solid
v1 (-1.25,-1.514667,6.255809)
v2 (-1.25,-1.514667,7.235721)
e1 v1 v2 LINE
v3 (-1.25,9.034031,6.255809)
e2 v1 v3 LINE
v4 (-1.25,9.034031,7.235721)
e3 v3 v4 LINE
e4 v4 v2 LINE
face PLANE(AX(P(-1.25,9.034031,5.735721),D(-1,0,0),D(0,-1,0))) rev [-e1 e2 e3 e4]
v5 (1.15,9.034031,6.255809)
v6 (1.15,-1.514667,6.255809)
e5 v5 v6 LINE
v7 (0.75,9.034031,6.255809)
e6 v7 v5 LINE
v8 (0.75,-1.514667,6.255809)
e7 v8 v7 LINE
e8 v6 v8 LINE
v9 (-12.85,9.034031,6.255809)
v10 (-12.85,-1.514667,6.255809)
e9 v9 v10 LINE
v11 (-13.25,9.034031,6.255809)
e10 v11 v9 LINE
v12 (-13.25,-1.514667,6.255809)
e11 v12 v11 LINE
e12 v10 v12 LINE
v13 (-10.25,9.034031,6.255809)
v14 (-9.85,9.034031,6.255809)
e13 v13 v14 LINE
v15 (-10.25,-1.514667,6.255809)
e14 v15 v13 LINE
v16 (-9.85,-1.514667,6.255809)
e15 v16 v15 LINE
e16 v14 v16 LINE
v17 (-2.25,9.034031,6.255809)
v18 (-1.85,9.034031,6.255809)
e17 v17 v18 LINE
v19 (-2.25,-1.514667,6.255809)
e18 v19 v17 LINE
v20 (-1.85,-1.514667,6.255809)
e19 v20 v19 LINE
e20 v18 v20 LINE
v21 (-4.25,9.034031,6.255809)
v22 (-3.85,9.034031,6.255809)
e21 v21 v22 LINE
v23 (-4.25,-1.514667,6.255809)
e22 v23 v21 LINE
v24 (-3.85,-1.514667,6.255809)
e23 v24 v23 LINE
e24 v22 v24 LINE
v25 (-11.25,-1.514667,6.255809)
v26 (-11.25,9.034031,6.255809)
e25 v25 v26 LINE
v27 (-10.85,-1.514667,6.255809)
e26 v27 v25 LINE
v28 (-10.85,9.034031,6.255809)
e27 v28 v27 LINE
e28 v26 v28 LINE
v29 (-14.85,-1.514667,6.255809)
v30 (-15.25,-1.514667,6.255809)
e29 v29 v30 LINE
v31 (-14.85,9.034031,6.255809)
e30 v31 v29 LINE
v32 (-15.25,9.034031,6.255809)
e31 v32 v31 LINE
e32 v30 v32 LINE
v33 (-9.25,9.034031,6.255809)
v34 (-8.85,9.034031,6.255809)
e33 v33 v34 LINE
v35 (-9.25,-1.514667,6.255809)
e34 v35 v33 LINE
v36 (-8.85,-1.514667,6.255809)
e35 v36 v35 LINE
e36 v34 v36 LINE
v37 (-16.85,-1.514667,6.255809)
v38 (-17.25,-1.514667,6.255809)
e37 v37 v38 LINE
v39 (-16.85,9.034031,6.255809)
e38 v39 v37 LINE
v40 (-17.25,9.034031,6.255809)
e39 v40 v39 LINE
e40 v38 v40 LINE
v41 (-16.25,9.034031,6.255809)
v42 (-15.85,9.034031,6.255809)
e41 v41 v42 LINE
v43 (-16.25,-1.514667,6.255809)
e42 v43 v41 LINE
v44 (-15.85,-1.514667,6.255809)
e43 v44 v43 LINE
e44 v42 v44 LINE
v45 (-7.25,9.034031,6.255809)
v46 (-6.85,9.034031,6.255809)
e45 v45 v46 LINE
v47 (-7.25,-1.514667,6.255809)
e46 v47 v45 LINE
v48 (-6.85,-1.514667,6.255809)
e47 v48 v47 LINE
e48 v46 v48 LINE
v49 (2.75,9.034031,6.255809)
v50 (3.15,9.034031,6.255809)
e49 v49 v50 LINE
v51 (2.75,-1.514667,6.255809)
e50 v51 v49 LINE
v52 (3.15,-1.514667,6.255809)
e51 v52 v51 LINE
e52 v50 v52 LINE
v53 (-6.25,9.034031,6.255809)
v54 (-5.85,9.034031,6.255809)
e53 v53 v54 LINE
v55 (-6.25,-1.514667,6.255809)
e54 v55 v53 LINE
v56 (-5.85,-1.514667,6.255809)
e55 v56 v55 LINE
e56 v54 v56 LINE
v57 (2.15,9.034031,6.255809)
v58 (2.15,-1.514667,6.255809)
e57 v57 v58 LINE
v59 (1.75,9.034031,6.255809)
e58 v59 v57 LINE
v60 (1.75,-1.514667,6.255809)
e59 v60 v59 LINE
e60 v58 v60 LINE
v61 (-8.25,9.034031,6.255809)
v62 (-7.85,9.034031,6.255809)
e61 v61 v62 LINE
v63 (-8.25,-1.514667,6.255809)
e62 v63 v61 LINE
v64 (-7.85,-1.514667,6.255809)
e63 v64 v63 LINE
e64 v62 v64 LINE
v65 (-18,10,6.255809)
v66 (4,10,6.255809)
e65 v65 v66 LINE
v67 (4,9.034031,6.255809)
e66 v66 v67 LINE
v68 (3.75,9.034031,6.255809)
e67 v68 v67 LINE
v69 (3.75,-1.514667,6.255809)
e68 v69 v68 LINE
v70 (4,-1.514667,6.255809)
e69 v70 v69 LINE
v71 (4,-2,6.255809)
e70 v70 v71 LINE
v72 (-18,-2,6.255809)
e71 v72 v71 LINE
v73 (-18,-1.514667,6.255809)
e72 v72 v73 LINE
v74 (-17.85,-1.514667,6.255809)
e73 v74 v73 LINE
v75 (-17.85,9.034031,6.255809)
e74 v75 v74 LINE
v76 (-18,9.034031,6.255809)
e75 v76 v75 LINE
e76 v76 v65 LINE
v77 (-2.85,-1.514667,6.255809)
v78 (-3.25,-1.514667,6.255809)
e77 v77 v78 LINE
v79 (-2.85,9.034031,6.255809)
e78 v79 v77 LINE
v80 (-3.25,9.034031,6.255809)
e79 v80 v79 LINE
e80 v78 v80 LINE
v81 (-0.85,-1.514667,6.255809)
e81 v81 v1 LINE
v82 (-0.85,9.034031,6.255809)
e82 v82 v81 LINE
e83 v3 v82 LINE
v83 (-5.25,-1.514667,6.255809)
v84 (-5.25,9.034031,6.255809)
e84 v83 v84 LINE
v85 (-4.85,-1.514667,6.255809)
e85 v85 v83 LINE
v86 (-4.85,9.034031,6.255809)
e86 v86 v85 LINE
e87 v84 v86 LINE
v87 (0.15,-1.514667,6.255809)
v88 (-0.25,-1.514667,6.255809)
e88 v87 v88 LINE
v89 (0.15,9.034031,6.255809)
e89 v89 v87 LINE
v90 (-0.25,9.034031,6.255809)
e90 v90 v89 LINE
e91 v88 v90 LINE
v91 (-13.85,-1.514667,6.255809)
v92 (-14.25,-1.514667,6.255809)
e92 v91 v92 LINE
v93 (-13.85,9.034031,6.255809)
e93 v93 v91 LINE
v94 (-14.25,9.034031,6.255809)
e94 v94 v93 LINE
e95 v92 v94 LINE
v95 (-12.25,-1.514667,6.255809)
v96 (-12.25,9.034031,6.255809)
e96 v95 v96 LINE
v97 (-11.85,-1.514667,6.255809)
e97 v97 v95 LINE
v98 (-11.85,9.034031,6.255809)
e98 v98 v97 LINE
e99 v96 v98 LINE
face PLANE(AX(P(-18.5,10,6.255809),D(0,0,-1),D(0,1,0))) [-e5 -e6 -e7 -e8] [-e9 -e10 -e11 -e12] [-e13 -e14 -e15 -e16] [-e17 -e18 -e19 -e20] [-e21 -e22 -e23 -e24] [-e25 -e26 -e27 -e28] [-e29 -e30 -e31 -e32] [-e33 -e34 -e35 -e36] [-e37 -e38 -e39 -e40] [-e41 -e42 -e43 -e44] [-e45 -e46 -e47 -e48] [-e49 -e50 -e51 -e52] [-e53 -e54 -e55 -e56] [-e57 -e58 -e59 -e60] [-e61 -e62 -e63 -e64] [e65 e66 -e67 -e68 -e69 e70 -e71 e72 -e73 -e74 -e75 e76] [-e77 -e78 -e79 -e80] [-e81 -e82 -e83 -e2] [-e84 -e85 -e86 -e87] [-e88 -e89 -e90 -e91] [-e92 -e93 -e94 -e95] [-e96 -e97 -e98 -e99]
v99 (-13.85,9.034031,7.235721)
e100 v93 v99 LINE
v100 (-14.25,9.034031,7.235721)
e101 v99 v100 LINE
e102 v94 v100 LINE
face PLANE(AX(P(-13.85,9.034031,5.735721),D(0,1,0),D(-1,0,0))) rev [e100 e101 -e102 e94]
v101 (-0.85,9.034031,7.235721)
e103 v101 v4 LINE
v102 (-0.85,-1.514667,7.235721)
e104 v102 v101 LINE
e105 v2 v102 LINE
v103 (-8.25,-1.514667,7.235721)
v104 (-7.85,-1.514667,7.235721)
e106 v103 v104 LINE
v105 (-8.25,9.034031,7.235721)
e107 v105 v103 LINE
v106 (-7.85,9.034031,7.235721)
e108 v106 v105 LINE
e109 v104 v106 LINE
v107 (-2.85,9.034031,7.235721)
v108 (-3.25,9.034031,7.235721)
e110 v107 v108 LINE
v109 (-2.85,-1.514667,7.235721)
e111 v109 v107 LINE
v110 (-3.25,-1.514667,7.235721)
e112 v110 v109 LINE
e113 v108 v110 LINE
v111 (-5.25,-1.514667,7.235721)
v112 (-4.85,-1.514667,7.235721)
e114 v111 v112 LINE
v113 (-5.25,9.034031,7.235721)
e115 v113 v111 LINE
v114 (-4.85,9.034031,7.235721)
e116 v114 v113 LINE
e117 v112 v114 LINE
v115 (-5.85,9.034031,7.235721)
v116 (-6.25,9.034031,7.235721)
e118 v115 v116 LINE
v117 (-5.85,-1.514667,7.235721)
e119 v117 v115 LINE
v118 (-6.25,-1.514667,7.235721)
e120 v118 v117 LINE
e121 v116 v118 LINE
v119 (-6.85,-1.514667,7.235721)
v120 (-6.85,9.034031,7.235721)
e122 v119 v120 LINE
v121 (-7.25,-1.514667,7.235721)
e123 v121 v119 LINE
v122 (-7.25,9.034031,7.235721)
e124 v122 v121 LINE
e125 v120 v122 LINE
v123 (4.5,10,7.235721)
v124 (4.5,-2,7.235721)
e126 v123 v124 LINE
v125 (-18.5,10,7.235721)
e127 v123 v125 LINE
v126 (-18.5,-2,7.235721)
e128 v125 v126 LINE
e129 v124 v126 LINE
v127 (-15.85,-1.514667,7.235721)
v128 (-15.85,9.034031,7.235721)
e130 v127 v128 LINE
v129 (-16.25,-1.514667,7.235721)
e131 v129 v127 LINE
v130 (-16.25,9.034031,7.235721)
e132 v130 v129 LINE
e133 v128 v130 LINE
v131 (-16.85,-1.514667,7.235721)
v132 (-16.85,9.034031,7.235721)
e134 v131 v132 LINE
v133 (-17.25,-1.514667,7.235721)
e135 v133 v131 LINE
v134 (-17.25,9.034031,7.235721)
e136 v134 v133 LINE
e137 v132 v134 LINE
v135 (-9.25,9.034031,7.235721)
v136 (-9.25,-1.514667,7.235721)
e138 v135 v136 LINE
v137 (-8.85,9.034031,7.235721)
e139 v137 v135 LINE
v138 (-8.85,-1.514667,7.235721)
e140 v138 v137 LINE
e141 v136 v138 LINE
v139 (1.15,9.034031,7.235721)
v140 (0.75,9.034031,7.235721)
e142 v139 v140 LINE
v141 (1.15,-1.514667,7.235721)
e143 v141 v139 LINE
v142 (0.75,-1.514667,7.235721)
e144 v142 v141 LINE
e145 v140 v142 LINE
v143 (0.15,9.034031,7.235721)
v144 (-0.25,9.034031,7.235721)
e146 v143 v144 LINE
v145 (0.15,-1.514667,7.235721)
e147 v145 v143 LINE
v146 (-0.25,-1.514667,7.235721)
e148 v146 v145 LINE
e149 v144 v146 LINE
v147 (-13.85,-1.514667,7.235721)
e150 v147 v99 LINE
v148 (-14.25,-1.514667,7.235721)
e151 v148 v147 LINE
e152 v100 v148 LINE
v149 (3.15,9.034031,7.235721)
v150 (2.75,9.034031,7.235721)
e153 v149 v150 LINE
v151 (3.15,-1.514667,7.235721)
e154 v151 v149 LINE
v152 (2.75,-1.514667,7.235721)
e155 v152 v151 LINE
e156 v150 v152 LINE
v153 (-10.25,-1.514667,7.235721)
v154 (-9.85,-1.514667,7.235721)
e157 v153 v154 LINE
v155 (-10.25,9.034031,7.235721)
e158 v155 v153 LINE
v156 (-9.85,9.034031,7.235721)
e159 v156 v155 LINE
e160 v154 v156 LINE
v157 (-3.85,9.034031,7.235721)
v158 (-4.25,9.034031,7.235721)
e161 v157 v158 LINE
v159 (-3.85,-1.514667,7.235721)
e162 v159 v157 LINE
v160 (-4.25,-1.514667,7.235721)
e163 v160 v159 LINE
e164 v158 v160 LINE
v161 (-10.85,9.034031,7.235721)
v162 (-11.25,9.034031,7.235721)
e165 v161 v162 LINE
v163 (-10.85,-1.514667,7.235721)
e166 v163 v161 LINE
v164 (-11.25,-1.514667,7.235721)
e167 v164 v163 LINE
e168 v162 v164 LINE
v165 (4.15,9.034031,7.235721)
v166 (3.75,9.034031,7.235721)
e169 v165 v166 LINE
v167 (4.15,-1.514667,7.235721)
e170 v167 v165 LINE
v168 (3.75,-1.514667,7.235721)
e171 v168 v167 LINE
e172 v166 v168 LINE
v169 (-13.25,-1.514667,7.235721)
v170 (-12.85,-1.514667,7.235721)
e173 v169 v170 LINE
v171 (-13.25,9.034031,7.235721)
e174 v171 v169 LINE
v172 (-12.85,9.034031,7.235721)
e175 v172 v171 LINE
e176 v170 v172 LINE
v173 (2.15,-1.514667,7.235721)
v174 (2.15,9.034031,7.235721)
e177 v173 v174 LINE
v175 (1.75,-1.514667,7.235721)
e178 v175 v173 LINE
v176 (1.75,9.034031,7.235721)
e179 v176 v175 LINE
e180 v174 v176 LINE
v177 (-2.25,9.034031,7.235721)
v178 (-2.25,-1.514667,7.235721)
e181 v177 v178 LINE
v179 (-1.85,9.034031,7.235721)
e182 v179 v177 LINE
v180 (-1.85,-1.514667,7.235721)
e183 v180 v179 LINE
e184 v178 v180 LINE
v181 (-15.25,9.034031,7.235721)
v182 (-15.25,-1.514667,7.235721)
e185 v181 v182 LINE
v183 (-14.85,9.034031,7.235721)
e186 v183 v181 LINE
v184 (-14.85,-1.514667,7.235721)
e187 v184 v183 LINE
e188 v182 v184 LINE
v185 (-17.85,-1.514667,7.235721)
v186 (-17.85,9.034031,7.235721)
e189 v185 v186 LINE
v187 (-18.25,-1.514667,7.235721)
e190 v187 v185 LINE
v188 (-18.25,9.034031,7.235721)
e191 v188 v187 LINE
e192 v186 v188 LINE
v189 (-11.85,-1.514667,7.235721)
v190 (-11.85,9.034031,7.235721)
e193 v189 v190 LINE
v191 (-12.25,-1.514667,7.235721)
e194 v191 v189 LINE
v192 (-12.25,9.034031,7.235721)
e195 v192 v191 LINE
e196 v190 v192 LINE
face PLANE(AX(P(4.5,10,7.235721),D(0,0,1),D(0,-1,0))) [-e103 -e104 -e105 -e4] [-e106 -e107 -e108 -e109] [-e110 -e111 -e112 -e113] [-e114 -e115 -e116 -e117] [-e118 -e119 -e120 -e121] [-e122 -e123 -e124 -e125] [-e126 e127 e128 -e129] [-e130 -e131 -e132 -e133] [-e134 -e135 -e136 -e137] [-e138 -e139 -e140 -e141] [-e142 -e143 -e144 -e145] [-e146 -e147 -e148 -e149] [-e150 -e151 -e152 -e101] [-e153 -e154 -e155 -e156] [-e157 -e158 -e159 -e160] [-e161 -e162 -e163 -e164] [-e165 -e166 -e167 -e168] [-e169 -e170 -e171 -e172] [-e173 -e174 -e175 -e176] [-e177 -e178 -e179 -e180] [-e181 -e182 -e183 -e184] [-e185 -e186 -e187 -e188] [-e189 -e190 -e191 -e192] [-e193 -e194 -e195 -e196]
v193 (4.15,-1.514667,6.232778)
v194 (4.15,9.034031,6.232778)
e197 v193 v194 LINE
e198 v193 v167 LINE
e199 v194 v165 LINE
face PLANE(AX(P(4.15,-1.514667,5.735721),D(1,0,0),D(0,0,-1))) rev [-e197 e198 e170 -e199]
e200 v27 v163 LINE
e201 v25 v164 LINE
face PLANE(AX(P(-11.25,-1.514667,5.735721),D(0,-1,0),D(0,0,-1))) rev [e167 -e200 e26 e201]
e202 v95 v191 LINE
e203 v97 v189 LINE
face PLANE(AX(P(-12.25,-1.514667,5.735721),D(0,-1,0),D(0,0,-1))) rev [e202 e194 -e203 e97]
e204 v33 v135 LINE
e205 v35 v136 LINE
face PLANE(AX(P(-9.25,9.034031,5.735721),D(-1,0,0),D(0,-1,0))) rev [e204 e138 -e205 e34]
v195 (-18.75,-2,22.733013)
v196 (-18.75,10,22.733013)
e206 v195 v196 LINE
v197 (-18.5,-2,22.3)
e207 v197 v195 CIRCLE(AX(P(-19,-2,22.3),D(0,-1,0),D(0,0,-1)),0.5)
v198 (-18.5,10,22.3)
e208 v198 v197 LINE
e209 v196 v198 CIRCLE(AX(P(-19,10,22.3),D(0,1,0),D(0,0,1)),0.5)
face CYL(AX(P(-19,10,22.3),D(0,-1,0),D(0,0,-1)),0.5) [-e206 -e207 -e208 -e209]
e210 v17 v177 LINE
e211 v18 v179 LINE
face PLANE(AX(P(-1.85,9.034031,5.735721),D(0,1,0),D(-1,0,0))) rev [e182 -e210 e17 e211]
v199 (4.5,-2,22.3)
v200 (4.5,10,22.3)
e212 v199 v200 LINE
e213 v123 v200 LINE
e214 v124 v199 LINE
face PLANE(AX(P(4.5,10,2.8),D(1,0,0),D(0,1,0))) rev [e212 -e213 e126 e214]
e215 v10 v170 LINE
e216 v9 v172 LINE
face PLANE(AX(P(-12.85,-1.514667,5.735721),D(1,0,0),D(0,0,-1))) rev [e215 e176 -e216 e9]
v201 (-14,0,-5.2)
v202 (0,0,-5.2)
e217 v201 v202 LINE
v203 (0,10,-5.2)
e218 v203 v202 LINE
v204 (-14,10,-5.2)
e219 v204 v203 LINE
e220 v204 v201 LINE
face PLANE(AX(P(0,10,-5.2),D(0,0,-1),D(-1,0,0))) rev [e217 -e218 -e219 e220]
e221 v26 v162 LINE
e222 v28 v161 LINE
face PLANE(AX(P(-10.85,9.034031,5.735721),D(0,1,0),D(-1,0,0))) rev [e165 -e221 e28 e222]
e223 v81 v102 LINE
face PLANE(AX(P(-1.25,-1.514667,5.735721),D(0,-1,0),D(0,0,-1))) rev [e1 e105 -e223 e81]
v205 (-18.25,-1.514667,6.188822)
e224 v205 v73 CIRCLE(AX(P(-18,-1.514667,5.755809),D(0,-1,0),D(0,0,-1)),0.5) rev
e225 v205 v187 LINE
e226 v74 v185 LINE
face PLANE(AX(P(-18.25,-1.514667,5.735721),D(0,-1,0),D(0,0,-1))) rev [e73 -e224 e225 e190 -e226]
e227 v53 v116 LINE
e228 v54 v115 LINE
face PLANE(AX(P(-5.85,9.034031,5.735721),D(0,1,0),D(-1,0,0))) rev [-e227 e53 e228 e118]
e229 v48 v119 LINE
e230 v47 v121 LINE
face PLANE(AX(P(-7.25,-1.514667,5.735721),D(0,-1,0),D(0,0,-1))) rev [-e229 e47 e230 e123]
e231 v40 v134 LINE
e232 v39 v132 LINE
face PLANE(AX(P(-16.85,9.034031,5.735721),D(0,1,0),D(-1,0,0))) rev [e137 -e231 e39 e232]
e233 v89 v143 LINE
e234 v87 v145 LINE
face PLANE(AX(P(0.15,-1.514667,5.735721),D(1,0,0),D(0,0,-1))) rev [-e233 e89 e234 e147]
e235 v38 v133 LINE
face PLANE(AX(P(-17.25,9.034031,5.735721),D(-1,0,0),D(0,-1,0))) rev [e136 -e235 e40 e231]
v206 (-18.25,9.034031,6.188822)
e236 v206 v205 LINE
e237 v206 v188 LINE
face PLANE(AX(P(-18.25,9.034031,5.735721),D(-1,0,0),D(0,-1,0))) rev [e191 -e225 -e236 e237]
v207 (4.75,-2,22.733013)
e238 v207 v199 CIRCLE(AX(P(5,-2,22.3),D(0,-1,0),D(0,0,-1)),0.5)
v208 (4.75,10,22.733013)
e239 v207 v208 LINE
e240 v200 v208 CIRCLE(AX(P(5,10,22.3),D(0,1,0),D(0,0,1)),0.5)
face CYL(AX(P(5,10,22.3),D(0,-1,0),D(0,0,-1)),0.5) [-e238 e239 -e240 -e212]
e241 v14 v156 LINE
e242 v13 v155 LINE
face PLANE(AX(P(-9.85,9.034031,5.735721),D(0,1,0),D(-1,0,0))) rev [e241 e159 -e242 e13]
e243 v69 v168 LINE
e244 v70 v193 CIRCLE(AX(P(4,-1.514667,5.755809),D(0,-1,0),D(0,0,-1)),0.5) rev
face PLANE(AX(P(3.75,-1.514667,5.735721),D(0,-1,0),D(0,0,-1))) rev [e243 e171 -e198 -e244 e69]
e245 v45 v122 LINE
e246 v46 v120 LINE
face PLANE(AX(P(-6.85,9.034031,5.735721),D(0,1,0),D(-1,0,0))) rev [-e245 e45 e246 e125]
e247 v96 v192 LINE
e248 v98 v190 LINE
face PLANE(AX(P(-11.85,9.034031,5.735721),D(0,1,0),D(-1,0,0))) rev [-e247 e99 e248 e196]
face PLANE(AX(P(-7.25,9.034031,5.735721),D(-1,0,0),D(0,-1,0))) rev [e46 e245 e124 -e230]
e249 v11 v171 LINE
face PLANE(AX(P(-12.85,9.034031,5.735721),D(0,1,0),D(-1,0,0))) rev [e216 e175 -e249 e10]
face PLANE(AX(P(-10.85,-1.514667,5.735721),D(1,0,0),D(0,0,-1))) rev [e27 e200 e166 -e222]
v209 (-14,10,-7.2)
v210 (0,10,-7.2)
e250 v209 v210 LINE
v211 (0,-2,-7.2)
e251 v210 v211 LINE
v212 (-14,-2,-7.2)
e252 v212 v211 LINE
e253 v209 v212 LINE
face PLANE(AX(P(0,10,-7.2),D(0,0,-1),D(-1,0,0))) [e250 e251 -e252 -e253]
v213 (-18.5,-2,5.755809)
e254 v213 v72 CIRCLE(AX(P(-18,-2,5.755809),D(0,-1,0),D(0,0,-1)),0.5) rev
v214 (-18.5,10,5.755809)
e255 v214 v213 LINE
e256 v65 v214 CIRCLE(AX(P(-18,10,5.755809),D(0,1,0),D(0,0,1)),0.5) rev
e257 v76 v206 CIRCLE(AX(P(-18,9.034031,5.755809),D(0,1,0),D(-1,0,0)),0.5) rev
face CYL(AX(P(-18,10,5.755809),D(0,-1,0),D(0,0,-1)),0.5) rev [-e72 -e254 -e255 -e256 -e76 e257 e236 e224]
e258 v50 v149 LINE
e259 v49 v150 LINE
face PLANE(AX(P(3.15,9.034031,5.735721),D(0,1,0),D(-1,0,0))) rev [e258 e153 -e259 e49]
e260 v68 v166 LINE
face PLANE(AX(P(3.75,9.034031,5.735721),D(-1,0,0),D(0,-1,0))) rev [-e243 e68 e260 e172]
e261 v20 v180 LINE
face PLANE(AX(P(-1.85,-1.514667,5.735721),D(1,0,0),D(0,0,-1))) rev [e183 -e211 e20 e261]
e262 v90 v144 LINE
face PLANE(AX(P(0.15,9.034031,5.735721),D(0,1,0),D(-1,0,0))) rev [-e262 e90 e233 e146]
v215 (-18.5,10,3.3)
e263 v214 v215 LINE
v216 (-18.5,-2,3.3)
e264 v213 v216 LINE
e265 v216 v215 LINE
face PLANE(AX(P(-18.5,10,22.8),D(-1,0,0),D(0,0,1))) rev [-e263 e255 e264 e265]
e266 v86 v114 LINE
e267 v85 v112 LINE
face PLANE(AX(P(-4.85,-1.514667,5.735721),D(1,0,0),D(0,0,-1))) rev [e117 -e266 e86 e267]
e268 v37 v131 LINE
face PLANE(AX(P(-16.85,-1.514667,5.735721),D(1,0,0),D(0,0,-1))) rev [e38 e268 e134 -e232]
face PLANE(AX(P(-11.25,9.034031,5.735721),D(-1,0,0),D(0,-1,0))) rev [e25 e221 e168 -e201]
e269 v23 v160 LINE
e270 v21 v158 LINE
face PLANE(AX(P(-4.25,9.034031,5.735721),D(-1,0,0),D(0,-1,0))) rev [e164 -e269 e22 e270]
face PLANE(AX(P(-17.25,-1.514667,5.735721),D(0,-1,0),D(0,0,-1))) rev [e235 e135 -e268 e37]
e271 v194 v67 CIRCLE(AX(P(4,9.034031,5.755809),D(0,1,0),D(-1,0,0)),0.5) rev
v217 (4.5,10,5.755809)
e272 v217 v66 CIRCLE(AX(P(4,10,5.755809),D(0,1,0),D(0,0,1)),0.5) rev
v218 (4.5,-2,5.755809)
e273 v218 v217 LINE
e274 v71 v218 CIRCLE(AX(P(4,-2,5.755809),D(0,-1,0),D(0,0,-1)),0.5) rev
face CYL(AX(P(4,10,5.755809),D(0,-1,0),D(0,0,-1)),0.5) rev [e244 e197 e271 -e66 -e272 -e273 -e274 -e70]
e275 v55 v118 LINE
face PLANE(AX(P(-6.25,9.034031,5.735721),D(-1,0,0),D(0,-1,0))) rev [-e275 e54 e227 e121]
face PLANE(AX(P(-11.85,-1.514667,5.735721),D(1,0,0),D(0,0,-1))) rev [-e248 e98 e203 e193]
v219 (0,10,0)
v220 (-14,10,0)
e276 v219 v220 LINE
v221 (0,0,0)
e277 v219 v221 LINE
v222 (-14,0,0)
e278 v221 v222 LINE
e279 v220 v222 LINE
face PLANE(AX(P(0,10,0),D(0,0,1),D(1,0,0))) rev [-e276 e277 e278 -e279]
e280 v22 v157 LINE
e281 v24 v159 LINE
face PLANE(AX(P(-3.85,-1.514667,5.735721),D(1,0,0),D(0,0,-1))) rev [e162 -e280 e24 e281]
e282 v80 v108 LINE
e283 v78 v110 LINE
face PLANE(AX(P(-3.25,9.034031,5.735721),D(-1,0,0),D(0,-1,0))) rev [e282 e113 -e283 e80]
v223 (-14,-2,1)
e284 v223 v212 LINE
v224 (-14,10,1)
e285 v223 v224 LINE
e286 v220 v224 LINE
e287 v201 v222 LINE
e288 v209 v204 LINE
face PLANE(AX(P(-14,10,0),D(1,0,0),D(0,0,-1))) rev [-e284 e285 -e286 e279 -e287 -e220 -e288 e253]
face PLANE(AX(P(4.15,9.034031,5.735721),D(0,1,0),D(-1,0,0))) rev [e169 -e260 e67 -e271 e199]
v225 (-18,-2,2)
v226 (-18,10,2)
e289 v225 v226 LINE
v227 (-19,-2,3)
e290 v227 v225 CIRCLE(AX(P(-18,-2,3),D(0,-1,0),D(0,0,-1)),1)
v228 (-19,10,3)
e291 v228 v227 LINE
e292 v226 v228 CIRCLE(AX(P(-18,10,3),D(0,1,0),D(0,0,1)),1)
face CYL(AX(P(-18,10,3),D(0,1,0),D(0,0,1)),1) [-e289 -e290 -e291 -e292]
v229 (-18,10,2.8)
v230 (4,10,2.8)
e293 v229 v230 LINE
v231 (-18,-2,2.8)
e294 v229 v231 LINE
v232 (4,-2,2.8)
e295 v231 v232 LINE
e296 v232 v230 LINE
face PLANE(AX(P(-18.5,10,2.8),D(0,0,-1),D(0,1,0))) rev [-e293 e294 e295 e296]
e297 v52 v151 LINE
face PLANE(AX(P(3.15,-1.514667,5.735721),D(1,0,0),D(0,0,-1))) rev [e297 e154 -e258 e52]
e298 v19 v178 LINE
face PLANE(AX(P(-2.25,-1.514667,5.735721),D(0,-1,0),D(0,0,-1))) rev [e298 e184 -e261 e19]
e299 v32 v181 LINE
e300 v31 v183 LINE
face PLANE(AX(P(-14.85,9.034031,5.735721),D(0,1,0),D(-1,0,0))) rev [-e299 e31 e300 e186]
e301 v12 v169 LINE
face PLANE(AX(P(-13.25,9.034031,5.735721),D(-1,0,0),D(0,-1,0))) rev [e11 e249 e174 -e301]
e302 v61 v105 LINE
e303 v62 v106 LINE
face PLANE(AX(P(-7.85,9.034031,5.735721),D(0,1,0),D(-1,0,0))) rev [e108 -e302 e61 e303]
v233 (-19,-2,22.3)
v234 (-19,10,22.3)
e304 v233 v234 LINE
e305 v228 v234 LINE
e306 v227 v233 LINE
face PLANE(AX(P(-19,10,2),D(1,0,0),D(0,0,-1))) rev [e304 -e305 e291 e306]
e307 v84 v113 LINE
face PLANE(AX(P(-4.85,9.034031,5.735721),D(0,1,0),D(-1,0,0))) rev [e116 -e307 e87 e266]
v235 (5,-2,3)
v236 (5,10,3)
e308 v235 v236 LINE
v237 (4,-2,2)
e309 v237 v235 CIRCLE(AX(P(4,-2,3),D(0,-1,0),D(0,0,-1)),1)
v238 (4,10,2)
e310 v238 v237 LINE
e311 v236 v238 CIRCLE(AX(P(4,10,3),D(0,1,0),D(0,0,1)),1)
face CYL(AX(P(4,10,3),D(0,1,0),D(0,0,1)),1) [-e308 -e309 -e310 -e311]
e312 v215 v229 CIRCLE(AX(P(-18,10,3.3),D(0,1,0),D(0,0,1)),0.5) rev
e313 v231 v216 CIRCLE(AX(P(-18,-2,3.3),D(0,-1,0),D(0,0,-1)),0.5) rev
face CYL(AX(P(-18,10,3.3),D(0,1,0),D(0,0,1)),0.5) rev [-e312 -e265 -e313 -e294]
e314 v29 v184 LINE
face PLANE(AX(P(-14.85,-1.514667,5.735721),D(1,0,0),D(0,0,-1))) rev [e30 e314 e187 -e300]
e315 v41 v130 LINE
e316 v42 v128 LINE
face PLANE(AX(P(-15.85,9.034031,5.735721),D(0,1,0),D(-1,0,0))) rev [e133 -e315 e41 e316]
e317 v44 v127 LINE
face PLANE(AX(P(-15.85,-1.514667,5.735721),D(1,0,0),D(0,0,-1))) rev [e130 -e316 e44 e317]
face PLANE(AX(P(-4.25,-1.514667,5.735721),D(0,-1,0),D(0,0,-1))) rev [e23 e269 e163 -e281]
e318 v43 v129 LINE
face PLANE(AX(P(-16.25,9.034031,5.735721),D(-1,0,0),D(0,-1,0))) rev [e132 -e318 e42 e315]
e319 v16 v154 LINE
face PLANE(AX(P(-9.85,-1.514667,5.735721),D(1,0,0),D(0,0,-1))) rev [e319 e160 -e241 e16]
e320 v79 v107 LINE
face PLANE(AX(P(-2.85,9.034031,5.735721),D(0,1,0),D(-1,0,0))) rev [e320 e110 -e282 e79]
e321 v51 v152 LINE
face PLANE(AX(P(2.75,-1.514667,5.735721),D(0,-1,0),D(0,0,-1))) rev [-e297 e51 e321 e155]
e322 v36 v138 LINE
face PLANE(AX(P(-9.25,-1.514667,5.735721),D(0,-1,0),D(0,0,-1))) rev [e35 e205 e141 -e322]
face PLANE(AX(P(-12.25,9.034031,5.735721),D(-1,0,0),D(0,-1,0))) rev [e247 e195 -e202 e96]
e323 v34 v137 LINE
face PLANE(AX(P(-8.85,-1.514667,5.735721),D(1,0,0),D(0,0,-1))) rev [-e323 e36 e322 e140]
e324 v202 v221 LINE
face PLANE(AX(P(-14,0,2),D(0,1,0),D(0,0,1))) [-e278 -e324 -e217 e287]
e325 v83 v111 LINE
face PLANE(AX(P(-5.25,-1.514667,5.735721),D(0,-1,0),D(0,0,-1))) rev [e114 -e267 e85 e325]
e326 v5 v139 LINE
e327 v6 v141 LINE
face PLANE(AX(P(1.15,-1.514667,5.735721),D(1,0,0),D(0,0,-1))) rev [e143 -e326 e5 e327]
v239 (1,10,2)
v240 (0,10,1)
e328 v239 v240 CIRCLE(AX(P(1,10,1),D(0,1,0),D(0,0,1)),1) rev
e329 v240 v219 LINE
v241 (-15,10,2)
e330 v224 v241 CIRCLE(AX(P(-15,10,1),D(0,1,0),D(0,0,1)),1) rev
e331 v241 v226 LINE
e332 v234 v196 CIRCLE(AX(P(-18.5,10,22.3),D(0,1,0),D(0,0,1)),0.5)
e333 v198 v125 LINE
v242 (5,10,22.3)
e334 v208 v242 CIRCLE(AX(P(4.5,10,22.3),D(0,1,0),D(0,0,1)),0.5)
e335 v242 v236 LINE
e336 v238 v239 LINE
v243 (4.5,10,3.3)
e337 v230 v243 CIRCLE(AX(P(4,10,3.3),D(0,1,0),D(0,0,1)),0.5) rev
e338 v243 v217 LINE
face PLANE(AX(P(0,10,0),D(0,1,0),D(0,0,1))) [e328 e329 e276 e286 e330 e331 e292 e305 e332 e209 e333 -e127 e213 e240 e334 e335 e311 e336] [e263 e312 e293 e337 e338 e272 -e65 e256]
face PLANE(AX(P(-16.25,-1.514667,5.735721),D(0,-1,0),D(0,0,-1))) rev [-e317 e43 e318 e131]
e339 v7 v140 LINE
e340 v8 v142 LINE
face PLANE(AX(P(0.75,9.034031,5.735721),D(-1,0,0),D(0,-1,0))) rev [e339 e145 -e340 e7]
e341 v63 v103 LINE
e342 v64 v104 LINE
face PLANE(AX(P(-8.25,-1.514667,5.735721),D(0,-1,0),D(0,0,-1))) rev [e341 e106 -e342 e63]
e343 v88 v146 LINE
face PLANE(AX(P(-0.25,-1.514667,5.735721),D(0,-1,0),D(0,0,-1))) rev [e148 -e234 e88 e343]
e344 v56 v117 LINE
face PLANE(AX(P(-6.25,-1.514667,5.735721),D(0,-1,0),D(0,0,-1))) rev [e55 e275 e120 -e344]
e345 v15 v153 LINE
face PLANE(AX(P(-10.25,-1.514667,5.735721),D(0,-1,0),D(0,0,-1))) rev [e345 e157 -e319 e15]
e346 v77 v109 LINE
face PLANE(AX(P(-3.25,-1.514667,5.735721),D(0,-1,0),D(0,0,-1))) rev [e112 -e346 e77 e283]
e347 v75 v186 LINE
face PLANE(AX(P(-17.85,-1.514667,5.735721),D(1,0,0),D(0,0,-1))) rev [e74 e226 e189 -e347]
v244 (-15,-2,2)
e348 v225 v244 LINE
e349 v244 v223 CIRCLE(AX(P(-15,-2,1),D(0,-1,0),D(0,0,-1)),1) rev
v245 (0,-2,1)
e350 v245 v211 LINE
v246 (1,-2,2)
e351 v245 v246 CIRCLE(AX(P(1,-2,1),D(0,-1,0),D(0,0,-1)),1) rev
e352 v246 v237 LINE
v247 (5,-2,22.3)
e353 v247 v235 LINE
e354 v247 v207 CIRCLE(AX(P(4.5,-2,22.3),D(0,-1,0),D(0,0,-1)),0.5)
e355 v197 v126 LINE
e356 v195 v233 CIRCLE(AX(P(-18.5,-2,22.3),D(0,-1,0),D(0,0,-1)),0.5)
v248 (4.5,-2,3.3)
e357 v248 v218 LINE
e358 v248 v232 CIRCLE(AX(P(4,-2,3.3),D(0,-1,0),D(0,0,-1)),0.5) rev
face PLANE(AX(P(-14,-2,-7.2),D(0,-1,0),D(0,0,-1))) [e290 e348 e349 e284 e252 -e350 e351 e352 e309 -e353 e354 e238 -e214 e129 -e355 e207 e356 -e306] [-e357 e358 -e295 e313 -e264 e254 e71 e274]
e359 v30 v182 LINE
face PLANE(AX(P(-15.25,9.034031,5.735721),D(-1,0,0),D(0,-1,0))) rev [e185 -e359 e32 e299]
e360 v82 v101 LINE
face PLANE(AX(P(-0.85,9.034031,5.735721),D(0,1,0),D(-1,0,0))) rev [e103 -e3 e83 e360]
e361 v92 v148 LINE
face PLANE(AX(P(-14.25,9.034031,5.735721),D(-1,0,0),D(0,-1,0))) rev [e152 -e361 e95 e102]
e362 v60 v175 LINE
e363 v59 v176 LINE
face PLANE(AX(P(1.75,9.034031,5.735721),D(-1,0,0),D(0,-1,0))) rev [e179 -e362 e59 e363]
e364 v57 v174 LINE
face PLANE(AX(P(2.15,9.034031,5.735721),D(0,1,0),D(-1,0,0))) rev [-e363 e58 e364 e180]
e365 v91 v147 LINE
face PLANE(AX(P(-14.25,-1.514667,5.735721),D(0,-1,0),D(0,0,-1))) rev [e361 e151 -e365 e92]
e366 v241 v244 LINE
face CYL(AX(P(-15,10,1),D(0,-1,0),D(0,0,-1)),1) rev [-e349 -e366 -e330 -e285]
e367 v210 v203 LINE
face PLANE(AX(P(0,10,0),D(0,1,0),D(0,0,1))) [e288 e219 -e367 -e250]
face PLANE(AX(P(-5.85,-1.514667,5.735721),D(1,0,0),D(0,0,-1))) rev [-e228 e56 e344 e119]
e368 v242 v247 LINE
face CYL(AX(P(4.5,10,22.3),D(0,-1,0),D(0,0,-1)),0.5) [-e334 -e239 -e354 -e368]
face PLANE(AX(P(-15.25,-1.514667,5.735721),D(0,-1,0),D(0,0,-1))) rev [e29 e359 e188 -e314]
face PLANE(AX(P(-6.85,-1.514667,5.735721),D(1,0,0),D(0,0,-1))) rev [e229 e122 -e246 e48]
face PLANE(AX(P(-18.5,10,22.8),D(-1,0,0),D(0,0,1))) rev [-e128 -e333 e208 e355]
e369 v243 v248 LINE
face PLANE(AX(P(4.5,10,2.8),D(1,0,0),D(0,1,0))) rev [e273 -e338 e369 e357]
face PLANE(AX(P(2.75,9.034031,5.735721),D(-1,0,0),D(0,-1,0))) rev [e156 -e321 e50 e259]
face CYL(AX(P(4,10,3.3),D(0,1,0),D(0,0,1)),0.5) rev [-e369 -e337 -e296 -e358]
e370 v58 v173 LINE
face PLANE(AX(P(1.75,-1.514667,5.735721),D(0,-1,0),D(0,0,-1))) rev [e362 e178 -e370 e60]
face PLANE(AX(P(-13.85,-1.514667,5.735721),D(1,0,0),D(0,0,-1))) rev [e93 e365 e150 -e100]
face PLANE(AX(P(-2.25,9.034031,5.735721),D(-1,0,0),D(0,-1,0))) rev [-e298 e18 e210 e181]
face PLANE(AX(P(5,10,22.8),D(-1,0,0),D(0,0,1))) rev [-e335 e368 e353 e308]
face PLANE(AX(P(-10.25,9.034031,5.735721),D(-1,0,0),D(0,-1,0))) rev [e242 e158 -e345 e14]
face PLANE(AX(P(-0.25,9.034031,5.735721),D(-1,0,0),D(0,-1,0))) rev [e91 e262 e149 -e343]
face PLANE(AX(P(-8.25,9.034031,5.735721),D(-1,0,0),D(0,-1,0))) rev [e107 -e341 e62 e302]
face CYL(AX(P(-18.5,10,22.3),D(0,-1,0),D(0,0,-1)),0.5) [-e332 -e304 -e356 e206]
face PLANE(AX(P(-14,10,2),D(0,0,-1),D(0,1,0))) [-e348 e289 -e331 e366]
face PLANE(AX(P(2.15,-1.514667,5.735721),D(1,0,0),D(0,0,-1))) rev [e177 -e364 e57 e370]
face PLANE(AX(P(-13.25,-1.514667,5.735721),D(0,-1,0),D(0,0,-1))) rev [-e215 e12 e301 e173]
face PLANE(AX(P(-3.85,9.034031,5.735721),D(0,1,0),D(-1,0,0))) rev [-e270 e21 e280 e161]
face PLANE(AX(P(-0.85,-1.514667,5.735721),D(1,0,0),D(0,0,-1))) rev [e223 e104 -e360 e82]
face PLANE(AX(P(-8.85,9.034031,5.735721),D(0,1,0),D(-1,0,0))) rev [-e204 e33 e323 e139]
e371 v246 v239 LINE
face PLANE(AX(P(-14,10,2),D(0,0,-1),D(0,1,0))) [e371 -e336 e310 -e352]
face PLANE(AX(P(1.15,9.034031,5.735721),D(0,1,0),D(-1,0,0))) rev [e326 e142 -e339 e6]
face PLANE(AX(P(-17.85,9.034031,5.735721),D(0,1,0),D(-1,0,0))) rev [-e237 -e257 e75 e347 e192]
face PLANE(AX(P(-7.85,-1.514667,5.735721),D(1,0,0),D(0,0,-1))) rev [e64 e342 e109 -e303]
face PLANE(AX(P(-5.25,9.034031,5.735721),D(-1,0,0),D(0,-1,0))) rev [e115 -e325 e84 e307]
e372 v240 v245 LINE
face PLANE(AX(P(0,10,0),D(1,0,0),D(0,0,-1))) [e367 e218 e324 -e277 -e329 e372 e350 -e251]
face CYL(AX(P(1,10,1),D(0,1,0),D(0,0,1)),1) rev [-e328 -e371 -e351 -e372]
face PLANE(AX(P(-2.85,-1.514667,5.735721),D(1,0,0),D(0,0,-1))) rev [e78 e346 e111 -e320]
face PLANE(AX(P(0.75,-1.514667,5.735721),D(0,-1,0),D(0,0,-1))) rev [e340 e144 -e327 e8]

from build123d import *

# Parameters (mm, degrees)
ESQUISSE3_W             = 14
ESQUISSE3_H             = 2
BOSS_EXTRU_1_DEPTH      = 10
BOSS_EXTRU_1_2_DEPTH    = 10
ESQUISSE4_W             = 9.2
ESQUISSE4_H             = 2
BOSS_EXTRU_2_DEPTH      = 14
BOSS_EXTRU_3_DEPTH      = 12
CONG_2_R                = 0.5
CONG_4_R                = 1
CONG_5_R                = 1
CONG_6_R                = 1
ESQUISSE6_W             = 23
ESQUISSE6_H             = 0.979911891
BOSS_EXTRU_4_DEPTH      = 12
CONG_8_R                = 0.5
ESQUISSE7_W             = 0.4
ESQUISSE7_H             = 10.548698827
ENL_V_MAT_EXTRU_1_DEPTH = 1.5


with BuildPart() as part:
    # Esquisse3 → Boss.-Extru.1 (new body)
    with BuildSketch(Plane(origin=(0, 0, 0), x_dir=(1, 0, 0), z_dir=(0, 1, 0))):
        with Locations((-7, 6.2)):
            Rectangle(ESQUISSE3_W, ESQUISSE3_H)
    extrude(amount=BOSS_EXTRU_1_DEPTH)



with BuildPart() as body_2:
    # Esquisse3 → Boss.-Extru.1 2 (new body)
    with BuildSketch(Plane(origin=(0, 0, 0), x_dir=(1, 0, 0), z_dir=(0, 1, 0))):
        with Locations((-7, -1)):
            Rectangle(ESQUISSE3_W, ESQUISSE3_H)
    extrude(amount=BOSS_EXTRU_1_2_DEPTH)


with BuildPart() as part_1:
    add(part.part)

    add(body_2.part)  # Boss.-Extru.2 merges body 2
    # Esquisse4 → Boss.-Extru.2 (add)
    with BuildSketch(Plane(origin=(0, 0, 0), x_dir=(0, 0, -1), z_dir=(1, 0, 0))):
        with Locations((2.6, -1)):
            Rectangle(ESQUISSE4_W, ESQUISSE4_H)
    extrude(amount=-BOSS_EXTRU_2_DEPTH)

    # Esquisse5 → Boss.-Extru.3 (add)
    with BuildSketch(Plane.XZ.offset(2)):
        Polygon((-14, 2), (-19, 2), (-19, 22.8), (-18.5, 22.8), (-18.5, 2.8), (4.5, 2.8), (4.5, 22.8), (5, 22.8), (5, 2), (0, 2), align=None)
    extrude(amount=-BOSS_EXTRU_3_DEPTH)

    # Congé2
    # the kernel refuses this fillet: 0.5 mm, written as the material it takes off along each edge
    with BuildSketch(Plane(origin=(-19, -3.25, 22.8), x_dir=(0, 0, -1), z_dir=(0, 1, 0)), Plane(origin=(-18.5, -3.25, 22.8), x_dir=(-1, 0, 0), z_dir=(0, 1, 0)), Plane(origin=(4.5, -3.25, 22.8), x_dir=(0, 0, -1), z_dir=(0, 1, 0)), Plane(origin=(5, -3.25, 22.8), x_dir=(-1, 0, 0), z_dir=(0, 1, 0))) as cong_2_piece_1:
        with BuildLine():
            CenterArc((CONG_2_R, -CONG_2_R), CONG_2_R, 90, 90)
            Line((0, -CONG_2_R), (0, 0))
            Line((0, 0), (CONG_2_R, 0))
        make_face()
    extrude(amount=14.5, mode=Mode.SUBTRACT)

    # Congé4
    cong_4_edges = [part_1.edges().sort_by_distance(p)[0] for p in [
        (-19, 4, 2),
    ]]
    fillet(cong_4_edges, radius=CONG_4_R)

    # Congé5
    cong_5_edges = [part_1.edges().sort_by_distance(p)[0] for p in [
        (5, 4, 2),
    ]]
    fillet(cong_5_edges, radius=CONG_5_R)

    # Congé6
    cong_6_edges = [part_1.edges().sort_by_distance(p)[0] for p in [
        (-14, 4, 2),
        (0, 4, 2),
    ]]
    fillet(cong_6_edges, radius=CONG_6_R)

    # Esquisse6 → Boss.-Extru.4 (add)
    with BuildSketch(Plane(origin=(0, -2, 0), x_dir=(-1, 0, 0), z_dir=(0, -1, 0))):
        with Locations((7, -6.745764799)):
            Rectangle(ESQUISSE6_W, ESQUISSE6_H)
    extrude(amount=-BOSS_EXTRU_4_DEPTH)

    # Congé8
    cong_8_edges = [part_1.edges().sort_by_distance(p)[0] for p in [
        (-18.5, 4, 6.255808853),
        (4.5, 4, 6.255808853),
        (-18.5, 4, 2.8),
        (4.5, 4, 2.8),
    ]]
    fillet(cong_8_edges, radius=CONG_8_R)

    # Esquisse7 → Enlèv. mat.-Extru.1 (cut)
    with BuildSketch(Plane.XY.offset(7.235720744)):
        with Locations((-18.05, 3.759681921)):
            Rectangle(ESQUISSE7_W, ESQUISSE7_H)
        with Locations((-17.05, 3.759681921)):
            Rectangle(ESQUISSE7_W, ESQUISSE7_H)
        with Locations((-16.05, 3.759681921)):
            Rectangle(ESQUISSE7_W, ESQUISSE7_H)
        with Locations((-15.05, 3.759681921)):
            Rectangle(ESQUISSE7_W, ESQUISSE7_H)
        with Locations((-14.05, 3.759681921)):
            Rectangle(ESQUISSE7_W, ESQUISSE7_H)
        with Locations((-13.05, 3.759681921)):
            Rectangle(ESQUISSE7_W, ESQUISSE7_H)
        with Locations((-12.05, 3.759681921)):
            Rectangle(ESQUISSE7_W, ESQUISSE7_H)
        with Locations((-11.05, 3.759681921)):
            Rectangle(ESQUISSE7_W, ESQUISSE7_H)
        with Locations((-10.05, 3.759681921)):
            Rectangle(ESQUISSE7_W, ESQUISSE7_H)
        with Locations((-9.05, 3.759681921)):
            Rectangle(ESQUISSE7_W, ESQUISSE7_H)
        with Locations((-8.05, 3.759681921)):
            Rectangle(ESQUISSE7_W, ESQUISSE7_H)
        with Locations((-7.05, 3.759681921)):
            Rectangle(ESQUISSE7_W, ESQUISSE7_H)
        with Locations((-6.05, 3.759681921)):
            Rectangle(ESQUISSE7_W, ESQUISSE7_H)
        with Locations((-5.05, 3.759681921)):
            Rectangle(ESQUISSE7_W, ESQUISSE7_H)
        with Locations((-4.05, 3.759681921)):
            Rectangle(ESQUISSE7_W, ESQUISSE7_H)
        with Locations((-3.05, 3.759681921)):
            Rectangle(ESQUISSE7_W, ESQUISSE7_H)
        with Locations((-2.05, 3.759681921)):
            Rectangle(ESQUISSE7_W, ESQUISSE7_H)
        with Locations((-1.05, 3.759681921)):
            Rectangle(ESQUISSE7_W, ESQUISSE7_H)
        with Locations((-0.05, 3.759681921)):
            Rectangle(ESQUISSE7_W, ESQUISSE7_H)
        with Locations((0.95, 3.759681921)):
            Rectangle(ESQUISSE7_W, ESQUISSE7_H)
        with Locations((1.95, 3.759681921)):
            Rectangle(ESQUISSE7_W, ESQUISSE7_H)
        with Locations((2.95, 3.759681921)):
            Rectangle(ESQUISSE7_W, ESQUISSE7_H)
        with Locations((3.95, 3.759681921)):
            Rectangle(ESQUISSE7_W, ESQUISSE7_H)
    extrude(amount=-ENL_V_MAT_EXTRU_1_DEPTH, mode=Mode.SUBTRACT)


solid = part_1.part
